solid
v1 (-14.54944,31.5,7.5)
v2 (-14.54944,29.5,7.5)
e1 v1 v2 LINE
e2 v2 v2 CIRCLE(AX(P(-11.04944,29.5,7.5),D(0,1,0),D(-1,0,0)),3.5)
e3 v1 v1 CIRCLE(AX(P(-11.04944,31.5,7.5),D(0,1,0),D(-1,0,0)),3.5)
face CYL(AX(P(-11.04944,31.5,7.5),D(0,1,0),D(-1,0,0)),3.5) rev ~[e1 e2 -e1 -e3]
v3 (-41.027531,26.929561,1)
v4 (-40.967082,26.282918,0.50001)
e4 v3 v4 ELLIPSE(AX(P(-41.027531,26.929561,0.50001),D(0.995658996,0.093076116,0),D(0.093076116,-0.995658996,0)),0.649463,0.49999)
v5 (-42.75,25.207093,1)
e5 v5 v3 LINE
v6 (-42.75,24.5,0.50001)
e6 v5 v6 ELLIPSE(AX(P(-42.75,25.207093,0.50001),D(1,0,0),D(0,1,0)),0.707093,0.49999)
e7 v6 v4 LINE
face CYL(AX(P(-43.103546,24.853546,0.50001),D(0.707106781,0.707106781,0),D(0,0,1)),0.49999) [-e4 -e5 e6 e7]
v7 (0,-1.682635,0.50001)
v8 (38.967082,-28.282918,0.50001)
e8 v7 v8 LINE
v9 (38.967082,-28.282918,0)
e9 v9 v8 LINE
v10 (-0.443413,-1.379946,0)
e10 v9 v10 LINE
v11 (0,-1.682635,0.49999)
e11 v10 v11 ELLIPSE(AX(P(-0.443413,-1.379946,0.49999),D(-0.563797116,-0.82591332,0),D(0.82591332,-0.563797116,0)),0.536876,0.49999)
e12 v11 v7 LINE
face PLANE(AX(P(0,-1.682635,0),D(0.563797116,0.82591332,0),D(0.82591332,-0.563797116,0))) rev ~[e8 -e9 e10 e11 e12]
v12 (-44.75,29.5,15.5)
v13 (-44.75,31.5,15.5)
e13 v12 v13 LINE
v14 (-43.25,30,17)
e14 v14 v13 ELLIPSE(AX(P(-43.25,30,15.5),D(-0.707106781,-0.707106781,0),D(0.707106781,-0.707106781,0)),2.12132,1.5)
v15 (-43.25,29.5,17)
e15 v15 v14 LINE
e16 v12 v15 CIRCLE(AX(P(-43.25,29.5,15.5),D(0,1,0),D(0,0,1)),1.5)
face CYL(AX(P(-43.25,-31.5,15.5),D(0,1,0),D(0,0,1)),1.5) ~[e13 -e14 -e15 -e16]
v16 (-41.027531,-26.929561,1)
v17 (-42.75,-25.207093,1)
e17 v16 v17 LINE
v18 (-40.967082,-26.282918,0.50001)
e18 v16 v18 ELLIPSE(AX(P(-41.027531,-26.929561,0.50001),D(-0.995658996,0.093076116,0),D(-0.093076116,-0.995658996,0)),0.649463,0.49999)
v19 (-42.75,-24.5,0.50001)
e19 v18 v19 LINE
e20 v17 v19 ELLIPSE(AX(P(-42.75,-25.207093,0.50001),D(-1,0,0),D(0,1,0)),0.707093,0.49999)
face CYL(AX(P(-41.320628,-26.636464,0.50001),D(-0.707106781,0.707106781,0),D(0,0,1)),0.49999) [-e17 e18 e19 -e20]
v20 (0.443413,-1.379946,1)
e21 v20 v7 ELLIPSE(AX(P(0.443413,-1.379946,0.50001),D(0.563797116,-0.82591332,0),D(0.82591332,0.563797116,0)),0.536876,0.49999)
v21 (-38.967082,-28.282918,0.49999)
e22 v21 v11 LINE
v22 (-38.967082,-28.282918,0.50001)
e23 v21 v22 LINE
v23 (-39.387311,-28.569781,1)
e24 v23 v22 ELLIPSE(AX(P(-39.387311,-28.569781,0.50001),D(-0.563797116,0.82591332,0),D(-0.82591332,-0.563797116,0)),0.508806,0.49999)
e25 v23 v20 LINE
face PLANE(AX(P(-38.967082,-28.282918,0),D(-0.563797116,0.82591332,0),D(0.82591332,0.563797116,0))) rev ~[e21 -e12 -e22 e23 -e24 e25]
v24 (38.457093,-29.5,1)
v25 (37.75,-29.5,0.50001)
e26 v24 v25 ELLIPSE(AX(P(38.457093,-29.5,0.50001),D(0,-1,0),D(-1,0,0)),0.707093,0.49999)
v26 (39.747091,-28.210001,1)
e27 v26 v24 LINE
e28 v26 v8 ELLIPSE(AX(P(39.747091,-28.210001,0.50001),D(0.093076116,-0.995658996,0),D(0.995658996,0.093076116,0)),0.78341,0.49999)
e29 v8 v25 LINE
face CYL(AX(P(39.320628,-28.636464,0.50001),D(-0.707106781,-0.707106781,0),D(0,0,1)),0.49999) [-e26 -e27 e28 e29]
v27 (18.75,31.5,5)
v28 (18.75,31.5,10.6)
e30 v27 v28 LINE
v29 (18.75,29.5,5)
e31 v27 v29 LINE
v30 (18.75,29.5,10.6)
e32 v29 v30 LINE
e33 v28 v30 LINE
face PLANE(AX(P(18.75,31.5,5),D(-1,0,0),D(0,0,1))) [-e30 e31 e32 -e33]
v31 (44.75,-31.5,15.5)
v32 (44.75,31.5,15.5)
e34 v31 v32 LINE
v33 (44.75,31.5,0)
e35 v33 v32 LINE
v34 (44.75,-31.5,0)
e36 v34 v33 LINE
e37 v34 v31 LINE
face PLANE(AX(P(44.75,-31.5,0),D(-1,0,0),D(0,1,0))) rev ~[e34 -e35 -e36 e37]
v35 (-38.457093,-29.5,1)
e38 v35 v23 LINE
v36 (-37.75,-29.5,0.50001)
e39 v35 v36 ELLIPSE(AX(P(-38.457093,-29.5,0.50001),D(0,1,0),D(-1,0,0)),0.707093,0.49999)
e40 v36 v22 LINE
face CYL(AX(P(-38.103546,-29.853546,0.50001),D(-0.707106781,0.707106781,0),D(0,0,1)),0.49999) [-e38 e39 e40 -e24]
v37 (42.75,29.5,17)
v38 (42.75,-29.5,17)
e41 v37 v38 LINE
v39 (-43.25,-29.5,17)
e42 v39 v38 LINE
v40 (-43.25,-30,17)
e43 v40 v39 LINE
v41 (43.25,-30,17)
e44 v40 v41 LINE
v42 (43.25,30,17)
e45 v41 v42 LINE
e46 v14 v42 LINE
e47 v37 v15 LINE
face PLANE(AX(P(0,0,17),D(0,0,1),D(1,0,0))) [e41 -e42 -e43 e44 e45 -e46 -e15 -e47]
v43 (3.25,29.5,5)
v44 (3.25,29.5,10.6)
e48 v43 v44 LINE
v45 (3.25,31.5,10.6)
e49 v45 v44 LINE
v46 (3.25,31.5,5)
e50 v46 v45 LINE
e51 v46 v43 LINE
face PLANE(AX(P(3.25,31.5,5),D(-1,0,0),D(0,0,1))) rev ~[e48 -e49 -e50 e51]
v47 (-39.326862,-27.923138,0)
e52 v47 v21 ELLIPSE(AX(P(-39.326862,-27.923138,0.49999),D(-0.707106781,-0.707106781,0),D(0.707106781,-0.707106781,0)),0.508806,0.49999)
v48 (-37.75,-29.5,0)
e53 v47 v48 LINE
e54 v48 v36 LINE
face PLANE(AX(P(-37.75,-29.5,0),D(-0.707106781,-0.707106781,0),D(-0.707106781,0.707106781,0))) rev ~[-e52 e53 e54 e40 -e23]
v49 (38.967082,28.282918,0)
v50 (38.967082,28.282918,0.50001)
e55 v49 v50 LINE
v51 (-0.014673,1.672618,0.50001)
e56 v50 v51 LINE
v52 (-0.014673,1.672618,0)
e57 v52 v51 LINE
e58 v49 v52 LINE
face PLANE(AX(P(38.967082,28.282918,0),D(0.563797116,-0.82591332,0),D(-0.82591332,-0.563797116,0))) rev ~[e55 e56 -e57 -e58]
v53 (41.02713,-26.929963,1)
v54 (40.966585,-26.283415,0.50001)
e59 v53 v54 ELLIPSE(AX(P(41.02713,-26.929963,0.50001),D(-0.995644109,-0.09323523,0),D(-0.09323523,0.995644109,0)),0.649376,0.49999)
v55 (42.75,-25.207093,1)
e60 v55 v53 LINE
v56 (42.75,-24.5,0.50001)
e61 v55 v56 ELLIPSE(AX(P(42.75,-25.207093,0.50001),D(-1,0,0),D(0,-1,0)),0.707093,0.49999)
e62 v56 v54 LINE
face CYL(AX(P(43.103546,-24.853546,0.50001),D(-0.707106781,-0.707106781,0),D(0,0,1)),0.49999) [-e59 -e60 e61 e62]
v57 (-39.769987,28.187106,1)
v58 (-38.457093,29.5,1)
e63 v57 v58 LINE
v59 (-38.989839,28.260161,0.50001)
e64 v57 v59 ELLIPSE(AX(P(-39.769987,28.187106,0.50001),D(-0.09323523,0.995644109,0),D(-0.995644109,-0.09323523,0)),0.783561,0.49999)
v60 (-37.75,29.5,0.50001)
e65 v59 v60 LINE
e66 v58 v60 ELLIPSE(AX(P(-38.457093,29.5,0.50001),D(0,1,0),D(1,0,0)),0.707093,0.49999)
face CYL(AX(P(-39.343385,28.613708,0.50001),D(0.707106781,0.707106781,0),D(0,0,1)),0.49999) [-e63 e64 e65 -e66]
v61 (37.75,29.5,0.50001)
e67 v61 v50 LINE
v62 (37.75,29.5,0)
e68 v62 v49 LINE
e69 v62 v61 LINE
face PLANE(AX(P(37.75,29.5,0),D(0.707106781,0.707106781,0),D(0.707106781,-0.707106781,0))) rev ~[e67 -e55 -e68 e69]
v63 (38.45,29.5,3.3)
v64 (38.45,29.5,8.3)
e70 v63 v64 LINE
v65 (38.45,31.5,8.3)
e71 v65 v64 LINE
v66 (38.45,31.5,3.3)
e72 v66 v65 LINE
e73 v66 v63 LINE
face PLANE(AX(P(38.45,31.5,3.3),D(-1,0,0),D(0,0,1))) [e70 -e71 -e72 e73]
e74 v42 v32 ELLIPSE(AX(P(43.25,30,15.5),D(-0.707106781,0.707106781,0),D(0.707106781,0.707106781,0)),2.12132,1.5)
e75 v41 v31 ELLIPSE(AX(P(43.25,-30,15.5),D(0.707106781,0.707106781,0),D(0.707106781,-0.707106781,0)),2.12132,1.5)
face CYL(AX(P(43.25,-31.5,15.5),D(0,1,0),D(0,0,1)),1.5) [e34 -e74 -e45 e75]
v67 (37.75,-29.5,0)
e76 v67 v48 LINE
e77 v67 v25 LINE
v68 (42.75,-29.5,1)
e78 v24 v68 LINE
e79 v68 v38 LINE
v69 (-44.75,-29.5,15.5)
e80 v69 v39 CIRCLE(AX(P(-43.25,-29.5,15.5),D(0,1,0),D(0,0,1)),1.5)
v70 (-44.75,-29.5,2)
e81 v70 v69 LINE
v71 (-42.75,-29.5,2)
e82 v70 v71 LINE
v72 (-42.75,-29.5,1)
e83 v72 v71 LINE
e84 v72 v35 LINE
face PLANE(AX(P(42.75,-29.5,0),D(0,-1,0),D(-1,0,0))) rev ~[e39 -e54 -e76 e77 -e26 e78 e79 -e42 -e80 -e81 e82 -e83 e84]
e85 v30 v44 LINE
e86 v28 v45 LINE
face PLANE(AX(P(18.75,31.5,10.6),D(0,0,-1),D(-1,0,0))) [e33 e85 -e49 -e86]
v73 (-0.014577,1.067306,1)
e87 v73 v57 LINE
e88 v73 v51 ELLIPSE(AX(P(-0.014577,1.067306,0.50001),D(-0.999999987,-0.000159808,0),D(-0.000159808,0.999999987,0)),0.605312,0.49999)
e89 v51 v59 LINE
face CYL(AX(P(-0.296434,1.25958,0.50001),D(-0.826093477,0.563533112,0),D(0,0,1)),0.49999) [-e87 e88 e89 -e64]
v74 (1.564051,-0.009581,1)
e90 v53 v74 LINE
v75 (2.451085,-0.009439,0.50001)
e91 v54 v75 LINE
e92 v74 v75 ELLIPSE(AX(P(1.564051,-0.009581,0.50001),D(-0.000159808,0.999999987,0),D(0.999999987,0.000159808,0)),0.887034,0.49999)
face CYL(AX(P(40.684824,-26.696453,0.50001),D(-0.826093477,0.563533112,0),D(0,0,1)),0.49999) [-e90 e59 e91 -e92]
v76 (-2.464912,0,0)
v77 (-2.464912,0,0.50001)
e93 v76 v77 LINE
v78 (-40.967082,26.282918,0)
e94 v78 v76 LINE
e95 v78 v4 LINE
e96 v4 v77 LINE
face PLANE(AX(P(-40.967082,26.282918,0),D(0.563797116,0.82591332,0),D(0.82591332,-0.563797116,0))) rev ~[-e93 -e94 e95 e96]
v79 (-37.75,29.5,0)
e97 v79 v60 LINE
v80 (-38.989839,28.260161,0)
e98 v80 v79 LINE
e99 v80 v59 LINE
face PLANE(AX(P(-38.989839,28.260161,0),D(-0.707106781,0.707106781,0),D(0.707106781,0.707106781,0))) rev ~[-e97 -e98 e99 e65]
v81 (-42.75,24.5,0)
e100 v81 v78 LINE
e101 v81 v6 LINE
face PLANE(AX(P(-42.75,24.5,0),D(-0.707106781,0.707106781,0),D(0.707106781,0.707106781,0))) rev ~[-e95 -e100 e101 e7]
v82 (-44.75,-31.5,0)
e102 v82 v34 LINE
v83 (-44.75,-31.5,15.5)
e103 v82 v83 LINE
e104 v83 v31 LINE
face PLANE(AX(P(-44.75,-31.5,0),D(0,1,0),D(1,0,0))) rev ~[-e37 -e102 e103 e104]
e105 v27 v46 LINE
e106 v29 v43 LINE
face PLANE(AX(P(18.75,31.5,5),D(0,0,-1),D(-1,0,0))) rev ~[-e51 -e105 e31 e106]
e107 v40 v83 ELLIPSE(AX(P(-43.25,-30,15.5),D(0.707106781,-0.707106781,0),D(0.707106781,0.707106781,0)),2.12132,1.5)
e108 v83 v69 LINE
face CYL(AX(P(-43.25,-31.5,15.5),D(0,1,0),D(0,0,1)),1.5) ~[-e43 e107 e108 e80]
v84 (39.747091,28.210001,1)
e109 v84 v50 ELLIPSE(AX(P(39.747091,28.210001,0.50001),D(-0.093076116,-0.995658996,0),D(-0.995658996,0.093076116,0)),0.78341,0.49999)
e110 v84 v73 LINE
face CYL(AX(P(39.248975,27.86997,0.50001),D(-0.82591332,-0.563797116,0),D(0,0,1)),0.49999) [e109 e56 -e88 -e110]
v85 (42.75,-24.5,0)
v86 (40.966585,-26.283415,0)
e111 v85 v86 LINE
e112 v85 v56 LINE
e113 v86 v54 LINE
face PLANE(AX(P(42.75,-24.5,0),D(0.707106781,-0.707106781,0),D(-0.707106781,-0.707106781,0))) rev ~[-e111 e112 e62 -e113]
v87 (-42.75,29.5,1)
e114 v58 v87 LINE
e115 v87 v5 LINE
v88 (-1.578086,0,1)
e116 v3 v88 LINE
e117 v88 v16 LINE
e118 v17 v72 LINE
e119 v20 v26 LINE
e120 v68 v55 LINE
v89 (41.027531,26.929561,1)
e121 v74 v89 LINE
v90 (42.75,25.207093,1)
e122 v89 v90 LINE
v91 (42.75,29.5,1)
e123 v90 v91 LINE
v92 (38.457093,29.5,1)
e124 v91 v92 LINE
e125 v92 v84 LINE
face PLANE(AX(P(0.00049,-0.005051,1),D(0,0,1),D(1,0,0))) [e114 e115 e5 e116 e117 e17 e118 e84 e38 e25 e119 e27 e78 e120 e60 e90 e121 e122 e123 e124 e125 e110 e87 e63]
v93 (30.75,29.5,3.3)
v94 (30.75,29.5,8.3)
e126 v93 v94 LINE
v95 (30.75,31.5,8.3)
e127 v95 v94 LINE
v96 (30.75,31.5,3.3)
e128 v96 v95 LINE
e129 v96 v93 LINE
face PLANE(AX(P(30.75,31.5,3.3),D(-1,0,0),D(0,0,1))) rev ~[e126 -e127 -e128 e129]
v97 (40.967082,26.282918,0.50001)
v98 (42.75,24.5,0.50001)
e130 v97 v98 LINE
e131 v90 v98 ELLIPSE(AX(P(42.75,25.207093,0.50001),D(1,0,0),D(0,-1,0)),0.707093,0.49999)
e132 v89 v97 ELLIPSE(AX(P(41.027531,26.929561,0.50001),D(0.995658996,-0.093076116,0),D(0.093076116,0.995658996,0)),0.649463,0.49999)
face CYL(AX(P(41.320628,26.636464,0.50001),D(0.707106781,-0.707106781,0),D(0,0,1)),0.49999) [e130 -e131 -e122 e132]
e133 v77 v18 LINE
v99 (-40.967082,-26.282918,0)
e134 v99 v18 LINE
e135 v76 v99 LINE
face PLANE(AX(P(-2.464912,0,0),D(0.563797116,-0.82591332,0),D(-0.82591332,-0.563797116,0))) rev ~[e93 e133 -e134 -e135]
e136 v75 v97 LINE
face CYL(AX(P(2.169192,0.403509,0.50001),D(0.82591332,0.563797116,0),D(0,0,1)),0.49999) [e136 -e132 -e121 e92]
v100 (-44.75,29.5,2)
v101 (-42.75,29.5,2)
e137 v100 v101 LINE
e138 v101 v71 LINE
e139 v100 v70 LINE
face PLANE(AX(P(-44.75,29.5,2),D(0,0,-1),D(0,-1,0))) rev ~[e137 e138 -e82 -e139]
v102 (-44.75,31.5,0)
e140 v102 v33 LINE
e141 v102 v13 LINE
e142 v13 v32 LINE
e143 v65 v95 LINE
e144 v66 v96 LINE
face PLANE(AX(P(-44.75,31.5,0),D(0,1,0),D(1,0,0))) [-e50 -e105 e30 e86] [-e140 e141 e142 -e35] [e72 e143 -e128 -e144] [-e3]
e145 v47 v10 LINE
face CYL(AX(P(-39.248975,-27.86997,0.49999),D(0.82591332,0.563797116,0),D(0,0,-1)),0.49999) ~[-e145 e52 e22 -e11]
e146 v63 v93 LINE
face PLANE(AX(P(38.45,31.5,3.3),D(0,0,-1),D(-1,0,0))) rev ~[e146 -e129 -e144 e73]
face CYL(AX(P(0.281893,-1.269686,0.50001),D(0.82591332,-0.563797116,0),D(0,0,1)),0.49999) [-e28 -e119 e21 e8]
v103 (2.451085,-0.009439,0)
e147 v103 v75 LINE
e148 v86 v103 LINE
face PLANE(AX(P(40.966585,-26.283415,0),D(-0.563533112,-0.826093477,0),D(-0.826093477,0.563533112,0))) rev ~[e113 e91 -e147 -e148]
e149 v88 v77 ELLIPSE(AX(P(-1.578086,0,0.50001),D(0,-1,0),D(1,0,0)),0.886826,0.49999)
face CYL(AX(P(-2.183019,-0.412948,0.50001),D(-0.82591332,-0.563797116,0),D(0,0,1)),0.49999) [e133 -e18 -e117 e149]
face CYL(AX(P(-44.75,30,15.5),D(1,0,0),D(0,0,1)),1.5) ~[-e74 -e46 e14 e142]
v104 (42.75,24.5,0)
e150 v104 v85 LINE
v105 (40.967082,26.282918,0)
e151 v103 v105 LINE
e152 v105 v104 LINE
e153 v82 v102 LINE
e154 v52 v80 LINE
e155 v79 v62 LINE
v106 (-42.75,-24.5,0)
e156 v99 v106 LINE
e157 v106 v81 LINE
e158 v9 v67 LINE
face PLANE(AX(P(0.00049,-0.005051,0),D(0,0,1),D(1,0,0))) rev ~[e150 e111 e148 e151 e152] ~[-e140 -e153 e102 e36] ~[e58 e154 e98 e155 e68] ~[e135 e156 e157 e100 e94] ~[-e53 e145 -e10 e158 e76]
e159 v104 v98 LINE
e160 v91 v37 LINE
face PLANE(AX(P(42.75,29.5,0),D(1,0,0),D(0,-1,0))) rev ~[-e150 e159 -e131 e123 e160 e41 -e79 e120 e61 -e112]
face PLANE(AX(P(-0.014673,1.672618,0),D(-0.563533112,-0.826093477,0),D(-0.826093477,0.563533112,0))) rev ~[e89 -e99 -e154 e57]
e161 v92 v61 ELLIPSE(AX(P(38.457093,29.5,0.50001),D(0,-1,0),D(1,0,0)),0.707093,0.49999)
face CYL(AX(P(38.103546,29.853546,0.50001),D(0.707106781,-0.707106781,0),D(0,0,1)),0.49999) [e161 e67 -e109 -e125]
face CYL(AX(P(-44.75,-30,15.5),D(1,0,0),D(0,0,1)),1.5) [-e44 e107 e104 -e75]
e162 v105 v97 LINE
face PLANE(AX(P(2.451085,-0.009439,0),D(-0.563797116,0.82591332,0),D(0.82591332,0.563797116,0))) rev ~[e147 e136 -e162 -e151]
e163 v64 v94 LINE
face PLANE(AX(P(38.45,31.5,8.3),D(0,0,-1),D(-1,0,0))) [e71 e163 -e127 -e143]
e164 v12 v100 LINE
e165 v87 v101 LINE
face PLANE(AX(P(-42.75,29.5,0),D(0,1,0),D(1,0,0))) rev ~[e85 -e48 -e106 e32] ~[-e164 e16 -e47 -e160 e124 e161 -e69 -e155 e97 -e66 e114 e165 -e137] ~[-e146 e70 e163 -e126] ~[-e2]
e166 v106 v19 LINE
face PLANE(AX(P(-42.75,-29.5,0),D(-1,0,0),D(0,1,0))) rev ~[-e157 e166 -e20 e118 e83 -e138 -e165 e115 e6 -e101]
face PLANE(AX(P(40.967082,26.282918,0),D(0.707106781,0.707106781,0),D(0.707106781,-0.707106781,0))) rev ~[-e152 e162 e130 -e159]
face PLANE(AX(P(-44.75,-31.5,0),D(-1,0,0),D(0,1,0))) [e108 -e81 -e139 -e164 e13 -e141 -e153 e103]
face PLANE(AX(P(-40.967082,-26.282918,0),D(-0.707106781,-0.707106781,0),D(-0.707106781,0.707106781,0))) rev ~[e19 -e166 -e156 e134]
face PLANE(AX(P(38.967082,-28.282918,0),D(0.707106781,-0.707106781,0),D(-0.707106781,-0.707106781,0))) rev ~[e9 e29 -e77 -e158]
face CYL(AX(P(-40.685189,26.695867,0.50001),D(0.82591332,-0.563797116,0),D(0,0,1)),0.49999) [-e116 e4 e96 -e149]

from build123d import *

# Parameters (mm, degrees)
F0_W     = 89.5
F0_H     = 63
F1_DEPTH = 17
F2_DEPTH = 1
F3_R     = 1.5
F4_R     = 0.49999
F5_W     = 7.7
F5_H     = 5
F5_W_2   = 15.5
F5_H_2   = 5.6
F5_R     = 3.5
F6_DEPTH = 25
F7_W     = 59
F7_H     = 13.5
F7_H_2   = 3.5
F8_DEPTH = 25


# Not quite as in the source:
# - a fillet or chamfer is up to 0.001 mm smaller than in the source, because OpenCascade refuses the exact size


with BuildPart() as f1:
    # F0 (on Top) → F1 (new body)
    with BuildSketch(Plane.XY):
        Rectangle(F0_W, F0_H)
        Polygon((-42.75, 24.5), (-42.75, 29.5), (-37.75, 29.5), (37.75, 29.5), (42.75, 29.5), (42.75, 24.5), (42.75, -24.5), (42.75, -29.5), (37.75, -29.5), (-37.75, -29.5), (-42.75, -29.5), (-42.75, -24.5), align=None, mode=Mode.SUBTRACT)
    extrude(amount=F1_DEPTH)

    # F0 (on Top) → F2 (join)
    with BuildSketch(Plane.XY):
        Polygon((-0.0146734692, 1.6726181109), (-38.9898385852, 28.2601614148), (-40.9670818505, 26.2829181495), (-2.4649122807, 0), (-40.9670818505, -26.2829181495), (-38.9670818505, -28.2829181495), (0, -1.6826347305), (38.9670818505, -28.2829181495), (40.96658534, -26.28341466), (2.4510848657, -0.0094390737), (40.9670818505, 26.2829181495), (38.9670818505, 28.2829181495), align=None)
        Polygon((-37.75, 29.5), (-42.75, 29.5), (-42.75, 24.5), (-40.9670818505, 26.2829181495), (-38.9898385852, 28.2601614148), align=None)
        Polygon((42.75, 29.5), (37.75, 29.5), (38.9670818505, 28.2829181495), (40.9670818505, 26.2829181495), (42.75, 24.5), align=None)
        Polygon((42.75, -29.5), (42.75, -24.5), (40.96658534, -26.28341466), (38.9670818505, -28.2829181495), (37.75, -29.5), align=None)
        Polygon((-40.9670818505, -26.2829181495), (-42.75, -24.5), (-42.75, -29.5), (-37.75, -29.5), (-38.9670818505, -28.2829181495), align=None)
    extrude(amount=F2_DEPTH)

    # F3
    f3_edges = [f1.edges().sort_by_distance(p)[0] for p in [
        (0, 31.5, 17),
        (-44.75, 0, 17),
        (0, -31.5, 17),
        (44.75, 0, 17),
    ]]
    fillet(f3_edges, radius=F3_R)

    # F4 (radius 0.5 in the source; OpenCascade refuses exactly that, so slightly less here)
    f4_edges = [f1.edges().sort_by_distance(p)[0] for p in [
        (-19.502256, 14.96639, 1),
        (-21.715997, 13.141459, 1),
        (19.476204, 14.977768, 1),
        (21.709083, 13.13674, 1),
        (-21.715997, -13.141459, 1),
        (-19.483541, -14.982776, 0),
        (19.483541, -14.982776, 1),
        (21.708835, -13.146427, 1),
        (-41.858541, 25.391459, 1),
        (-38.369919, 28.880081, 1),
        (41.858541, 25.391459, 1),
        (38.358541, 28.891459, 1),
        (-41.858541, -25.391459, 1),
        (-38.358541, -28.891459, 1),
        (41.858293, -25.391707, 1),
        (38.358541, -28.891459, 1),
    ]]
    fillet(f4_edges, radius=F4_R)

    # F5 (on face) → F6 (cut)
    with BuildSketch(Plane(origin=(0, 31.5, 0), x_dir=(-1, 0, 0), z_dir=(0, 1, 0))):
        with Locations((-34.6, 5.8)):
            Rectangle(F5_W, F5_H)
        with Locations((-11, 7.8)):
            Rectangle(F5_W_2, F5_H_2)
        with Locations((11.0494399613, 7.5)):
            Circle(F5_R)
    extrude(amount=-F6_DEPTH, mode=Mode.SUBTRACT)

    # F7 (on face) → F8 (cut)
    with BuildSketch(Plane(origin=(-44.75, 0, 0), x_dir=(0, -1, 0), z_dir=(-1, 0, 0))):
        with Locations((0, 8.75)):
            Rectangle(F7_W, F7_H)
        with Locations((0, 17.25)):
            Rectangle(F7_W, F7_H_2)
    extrude(amount=-F8_DEPTH, mode=Mode.SUBTRACT)


solid = f1.part
